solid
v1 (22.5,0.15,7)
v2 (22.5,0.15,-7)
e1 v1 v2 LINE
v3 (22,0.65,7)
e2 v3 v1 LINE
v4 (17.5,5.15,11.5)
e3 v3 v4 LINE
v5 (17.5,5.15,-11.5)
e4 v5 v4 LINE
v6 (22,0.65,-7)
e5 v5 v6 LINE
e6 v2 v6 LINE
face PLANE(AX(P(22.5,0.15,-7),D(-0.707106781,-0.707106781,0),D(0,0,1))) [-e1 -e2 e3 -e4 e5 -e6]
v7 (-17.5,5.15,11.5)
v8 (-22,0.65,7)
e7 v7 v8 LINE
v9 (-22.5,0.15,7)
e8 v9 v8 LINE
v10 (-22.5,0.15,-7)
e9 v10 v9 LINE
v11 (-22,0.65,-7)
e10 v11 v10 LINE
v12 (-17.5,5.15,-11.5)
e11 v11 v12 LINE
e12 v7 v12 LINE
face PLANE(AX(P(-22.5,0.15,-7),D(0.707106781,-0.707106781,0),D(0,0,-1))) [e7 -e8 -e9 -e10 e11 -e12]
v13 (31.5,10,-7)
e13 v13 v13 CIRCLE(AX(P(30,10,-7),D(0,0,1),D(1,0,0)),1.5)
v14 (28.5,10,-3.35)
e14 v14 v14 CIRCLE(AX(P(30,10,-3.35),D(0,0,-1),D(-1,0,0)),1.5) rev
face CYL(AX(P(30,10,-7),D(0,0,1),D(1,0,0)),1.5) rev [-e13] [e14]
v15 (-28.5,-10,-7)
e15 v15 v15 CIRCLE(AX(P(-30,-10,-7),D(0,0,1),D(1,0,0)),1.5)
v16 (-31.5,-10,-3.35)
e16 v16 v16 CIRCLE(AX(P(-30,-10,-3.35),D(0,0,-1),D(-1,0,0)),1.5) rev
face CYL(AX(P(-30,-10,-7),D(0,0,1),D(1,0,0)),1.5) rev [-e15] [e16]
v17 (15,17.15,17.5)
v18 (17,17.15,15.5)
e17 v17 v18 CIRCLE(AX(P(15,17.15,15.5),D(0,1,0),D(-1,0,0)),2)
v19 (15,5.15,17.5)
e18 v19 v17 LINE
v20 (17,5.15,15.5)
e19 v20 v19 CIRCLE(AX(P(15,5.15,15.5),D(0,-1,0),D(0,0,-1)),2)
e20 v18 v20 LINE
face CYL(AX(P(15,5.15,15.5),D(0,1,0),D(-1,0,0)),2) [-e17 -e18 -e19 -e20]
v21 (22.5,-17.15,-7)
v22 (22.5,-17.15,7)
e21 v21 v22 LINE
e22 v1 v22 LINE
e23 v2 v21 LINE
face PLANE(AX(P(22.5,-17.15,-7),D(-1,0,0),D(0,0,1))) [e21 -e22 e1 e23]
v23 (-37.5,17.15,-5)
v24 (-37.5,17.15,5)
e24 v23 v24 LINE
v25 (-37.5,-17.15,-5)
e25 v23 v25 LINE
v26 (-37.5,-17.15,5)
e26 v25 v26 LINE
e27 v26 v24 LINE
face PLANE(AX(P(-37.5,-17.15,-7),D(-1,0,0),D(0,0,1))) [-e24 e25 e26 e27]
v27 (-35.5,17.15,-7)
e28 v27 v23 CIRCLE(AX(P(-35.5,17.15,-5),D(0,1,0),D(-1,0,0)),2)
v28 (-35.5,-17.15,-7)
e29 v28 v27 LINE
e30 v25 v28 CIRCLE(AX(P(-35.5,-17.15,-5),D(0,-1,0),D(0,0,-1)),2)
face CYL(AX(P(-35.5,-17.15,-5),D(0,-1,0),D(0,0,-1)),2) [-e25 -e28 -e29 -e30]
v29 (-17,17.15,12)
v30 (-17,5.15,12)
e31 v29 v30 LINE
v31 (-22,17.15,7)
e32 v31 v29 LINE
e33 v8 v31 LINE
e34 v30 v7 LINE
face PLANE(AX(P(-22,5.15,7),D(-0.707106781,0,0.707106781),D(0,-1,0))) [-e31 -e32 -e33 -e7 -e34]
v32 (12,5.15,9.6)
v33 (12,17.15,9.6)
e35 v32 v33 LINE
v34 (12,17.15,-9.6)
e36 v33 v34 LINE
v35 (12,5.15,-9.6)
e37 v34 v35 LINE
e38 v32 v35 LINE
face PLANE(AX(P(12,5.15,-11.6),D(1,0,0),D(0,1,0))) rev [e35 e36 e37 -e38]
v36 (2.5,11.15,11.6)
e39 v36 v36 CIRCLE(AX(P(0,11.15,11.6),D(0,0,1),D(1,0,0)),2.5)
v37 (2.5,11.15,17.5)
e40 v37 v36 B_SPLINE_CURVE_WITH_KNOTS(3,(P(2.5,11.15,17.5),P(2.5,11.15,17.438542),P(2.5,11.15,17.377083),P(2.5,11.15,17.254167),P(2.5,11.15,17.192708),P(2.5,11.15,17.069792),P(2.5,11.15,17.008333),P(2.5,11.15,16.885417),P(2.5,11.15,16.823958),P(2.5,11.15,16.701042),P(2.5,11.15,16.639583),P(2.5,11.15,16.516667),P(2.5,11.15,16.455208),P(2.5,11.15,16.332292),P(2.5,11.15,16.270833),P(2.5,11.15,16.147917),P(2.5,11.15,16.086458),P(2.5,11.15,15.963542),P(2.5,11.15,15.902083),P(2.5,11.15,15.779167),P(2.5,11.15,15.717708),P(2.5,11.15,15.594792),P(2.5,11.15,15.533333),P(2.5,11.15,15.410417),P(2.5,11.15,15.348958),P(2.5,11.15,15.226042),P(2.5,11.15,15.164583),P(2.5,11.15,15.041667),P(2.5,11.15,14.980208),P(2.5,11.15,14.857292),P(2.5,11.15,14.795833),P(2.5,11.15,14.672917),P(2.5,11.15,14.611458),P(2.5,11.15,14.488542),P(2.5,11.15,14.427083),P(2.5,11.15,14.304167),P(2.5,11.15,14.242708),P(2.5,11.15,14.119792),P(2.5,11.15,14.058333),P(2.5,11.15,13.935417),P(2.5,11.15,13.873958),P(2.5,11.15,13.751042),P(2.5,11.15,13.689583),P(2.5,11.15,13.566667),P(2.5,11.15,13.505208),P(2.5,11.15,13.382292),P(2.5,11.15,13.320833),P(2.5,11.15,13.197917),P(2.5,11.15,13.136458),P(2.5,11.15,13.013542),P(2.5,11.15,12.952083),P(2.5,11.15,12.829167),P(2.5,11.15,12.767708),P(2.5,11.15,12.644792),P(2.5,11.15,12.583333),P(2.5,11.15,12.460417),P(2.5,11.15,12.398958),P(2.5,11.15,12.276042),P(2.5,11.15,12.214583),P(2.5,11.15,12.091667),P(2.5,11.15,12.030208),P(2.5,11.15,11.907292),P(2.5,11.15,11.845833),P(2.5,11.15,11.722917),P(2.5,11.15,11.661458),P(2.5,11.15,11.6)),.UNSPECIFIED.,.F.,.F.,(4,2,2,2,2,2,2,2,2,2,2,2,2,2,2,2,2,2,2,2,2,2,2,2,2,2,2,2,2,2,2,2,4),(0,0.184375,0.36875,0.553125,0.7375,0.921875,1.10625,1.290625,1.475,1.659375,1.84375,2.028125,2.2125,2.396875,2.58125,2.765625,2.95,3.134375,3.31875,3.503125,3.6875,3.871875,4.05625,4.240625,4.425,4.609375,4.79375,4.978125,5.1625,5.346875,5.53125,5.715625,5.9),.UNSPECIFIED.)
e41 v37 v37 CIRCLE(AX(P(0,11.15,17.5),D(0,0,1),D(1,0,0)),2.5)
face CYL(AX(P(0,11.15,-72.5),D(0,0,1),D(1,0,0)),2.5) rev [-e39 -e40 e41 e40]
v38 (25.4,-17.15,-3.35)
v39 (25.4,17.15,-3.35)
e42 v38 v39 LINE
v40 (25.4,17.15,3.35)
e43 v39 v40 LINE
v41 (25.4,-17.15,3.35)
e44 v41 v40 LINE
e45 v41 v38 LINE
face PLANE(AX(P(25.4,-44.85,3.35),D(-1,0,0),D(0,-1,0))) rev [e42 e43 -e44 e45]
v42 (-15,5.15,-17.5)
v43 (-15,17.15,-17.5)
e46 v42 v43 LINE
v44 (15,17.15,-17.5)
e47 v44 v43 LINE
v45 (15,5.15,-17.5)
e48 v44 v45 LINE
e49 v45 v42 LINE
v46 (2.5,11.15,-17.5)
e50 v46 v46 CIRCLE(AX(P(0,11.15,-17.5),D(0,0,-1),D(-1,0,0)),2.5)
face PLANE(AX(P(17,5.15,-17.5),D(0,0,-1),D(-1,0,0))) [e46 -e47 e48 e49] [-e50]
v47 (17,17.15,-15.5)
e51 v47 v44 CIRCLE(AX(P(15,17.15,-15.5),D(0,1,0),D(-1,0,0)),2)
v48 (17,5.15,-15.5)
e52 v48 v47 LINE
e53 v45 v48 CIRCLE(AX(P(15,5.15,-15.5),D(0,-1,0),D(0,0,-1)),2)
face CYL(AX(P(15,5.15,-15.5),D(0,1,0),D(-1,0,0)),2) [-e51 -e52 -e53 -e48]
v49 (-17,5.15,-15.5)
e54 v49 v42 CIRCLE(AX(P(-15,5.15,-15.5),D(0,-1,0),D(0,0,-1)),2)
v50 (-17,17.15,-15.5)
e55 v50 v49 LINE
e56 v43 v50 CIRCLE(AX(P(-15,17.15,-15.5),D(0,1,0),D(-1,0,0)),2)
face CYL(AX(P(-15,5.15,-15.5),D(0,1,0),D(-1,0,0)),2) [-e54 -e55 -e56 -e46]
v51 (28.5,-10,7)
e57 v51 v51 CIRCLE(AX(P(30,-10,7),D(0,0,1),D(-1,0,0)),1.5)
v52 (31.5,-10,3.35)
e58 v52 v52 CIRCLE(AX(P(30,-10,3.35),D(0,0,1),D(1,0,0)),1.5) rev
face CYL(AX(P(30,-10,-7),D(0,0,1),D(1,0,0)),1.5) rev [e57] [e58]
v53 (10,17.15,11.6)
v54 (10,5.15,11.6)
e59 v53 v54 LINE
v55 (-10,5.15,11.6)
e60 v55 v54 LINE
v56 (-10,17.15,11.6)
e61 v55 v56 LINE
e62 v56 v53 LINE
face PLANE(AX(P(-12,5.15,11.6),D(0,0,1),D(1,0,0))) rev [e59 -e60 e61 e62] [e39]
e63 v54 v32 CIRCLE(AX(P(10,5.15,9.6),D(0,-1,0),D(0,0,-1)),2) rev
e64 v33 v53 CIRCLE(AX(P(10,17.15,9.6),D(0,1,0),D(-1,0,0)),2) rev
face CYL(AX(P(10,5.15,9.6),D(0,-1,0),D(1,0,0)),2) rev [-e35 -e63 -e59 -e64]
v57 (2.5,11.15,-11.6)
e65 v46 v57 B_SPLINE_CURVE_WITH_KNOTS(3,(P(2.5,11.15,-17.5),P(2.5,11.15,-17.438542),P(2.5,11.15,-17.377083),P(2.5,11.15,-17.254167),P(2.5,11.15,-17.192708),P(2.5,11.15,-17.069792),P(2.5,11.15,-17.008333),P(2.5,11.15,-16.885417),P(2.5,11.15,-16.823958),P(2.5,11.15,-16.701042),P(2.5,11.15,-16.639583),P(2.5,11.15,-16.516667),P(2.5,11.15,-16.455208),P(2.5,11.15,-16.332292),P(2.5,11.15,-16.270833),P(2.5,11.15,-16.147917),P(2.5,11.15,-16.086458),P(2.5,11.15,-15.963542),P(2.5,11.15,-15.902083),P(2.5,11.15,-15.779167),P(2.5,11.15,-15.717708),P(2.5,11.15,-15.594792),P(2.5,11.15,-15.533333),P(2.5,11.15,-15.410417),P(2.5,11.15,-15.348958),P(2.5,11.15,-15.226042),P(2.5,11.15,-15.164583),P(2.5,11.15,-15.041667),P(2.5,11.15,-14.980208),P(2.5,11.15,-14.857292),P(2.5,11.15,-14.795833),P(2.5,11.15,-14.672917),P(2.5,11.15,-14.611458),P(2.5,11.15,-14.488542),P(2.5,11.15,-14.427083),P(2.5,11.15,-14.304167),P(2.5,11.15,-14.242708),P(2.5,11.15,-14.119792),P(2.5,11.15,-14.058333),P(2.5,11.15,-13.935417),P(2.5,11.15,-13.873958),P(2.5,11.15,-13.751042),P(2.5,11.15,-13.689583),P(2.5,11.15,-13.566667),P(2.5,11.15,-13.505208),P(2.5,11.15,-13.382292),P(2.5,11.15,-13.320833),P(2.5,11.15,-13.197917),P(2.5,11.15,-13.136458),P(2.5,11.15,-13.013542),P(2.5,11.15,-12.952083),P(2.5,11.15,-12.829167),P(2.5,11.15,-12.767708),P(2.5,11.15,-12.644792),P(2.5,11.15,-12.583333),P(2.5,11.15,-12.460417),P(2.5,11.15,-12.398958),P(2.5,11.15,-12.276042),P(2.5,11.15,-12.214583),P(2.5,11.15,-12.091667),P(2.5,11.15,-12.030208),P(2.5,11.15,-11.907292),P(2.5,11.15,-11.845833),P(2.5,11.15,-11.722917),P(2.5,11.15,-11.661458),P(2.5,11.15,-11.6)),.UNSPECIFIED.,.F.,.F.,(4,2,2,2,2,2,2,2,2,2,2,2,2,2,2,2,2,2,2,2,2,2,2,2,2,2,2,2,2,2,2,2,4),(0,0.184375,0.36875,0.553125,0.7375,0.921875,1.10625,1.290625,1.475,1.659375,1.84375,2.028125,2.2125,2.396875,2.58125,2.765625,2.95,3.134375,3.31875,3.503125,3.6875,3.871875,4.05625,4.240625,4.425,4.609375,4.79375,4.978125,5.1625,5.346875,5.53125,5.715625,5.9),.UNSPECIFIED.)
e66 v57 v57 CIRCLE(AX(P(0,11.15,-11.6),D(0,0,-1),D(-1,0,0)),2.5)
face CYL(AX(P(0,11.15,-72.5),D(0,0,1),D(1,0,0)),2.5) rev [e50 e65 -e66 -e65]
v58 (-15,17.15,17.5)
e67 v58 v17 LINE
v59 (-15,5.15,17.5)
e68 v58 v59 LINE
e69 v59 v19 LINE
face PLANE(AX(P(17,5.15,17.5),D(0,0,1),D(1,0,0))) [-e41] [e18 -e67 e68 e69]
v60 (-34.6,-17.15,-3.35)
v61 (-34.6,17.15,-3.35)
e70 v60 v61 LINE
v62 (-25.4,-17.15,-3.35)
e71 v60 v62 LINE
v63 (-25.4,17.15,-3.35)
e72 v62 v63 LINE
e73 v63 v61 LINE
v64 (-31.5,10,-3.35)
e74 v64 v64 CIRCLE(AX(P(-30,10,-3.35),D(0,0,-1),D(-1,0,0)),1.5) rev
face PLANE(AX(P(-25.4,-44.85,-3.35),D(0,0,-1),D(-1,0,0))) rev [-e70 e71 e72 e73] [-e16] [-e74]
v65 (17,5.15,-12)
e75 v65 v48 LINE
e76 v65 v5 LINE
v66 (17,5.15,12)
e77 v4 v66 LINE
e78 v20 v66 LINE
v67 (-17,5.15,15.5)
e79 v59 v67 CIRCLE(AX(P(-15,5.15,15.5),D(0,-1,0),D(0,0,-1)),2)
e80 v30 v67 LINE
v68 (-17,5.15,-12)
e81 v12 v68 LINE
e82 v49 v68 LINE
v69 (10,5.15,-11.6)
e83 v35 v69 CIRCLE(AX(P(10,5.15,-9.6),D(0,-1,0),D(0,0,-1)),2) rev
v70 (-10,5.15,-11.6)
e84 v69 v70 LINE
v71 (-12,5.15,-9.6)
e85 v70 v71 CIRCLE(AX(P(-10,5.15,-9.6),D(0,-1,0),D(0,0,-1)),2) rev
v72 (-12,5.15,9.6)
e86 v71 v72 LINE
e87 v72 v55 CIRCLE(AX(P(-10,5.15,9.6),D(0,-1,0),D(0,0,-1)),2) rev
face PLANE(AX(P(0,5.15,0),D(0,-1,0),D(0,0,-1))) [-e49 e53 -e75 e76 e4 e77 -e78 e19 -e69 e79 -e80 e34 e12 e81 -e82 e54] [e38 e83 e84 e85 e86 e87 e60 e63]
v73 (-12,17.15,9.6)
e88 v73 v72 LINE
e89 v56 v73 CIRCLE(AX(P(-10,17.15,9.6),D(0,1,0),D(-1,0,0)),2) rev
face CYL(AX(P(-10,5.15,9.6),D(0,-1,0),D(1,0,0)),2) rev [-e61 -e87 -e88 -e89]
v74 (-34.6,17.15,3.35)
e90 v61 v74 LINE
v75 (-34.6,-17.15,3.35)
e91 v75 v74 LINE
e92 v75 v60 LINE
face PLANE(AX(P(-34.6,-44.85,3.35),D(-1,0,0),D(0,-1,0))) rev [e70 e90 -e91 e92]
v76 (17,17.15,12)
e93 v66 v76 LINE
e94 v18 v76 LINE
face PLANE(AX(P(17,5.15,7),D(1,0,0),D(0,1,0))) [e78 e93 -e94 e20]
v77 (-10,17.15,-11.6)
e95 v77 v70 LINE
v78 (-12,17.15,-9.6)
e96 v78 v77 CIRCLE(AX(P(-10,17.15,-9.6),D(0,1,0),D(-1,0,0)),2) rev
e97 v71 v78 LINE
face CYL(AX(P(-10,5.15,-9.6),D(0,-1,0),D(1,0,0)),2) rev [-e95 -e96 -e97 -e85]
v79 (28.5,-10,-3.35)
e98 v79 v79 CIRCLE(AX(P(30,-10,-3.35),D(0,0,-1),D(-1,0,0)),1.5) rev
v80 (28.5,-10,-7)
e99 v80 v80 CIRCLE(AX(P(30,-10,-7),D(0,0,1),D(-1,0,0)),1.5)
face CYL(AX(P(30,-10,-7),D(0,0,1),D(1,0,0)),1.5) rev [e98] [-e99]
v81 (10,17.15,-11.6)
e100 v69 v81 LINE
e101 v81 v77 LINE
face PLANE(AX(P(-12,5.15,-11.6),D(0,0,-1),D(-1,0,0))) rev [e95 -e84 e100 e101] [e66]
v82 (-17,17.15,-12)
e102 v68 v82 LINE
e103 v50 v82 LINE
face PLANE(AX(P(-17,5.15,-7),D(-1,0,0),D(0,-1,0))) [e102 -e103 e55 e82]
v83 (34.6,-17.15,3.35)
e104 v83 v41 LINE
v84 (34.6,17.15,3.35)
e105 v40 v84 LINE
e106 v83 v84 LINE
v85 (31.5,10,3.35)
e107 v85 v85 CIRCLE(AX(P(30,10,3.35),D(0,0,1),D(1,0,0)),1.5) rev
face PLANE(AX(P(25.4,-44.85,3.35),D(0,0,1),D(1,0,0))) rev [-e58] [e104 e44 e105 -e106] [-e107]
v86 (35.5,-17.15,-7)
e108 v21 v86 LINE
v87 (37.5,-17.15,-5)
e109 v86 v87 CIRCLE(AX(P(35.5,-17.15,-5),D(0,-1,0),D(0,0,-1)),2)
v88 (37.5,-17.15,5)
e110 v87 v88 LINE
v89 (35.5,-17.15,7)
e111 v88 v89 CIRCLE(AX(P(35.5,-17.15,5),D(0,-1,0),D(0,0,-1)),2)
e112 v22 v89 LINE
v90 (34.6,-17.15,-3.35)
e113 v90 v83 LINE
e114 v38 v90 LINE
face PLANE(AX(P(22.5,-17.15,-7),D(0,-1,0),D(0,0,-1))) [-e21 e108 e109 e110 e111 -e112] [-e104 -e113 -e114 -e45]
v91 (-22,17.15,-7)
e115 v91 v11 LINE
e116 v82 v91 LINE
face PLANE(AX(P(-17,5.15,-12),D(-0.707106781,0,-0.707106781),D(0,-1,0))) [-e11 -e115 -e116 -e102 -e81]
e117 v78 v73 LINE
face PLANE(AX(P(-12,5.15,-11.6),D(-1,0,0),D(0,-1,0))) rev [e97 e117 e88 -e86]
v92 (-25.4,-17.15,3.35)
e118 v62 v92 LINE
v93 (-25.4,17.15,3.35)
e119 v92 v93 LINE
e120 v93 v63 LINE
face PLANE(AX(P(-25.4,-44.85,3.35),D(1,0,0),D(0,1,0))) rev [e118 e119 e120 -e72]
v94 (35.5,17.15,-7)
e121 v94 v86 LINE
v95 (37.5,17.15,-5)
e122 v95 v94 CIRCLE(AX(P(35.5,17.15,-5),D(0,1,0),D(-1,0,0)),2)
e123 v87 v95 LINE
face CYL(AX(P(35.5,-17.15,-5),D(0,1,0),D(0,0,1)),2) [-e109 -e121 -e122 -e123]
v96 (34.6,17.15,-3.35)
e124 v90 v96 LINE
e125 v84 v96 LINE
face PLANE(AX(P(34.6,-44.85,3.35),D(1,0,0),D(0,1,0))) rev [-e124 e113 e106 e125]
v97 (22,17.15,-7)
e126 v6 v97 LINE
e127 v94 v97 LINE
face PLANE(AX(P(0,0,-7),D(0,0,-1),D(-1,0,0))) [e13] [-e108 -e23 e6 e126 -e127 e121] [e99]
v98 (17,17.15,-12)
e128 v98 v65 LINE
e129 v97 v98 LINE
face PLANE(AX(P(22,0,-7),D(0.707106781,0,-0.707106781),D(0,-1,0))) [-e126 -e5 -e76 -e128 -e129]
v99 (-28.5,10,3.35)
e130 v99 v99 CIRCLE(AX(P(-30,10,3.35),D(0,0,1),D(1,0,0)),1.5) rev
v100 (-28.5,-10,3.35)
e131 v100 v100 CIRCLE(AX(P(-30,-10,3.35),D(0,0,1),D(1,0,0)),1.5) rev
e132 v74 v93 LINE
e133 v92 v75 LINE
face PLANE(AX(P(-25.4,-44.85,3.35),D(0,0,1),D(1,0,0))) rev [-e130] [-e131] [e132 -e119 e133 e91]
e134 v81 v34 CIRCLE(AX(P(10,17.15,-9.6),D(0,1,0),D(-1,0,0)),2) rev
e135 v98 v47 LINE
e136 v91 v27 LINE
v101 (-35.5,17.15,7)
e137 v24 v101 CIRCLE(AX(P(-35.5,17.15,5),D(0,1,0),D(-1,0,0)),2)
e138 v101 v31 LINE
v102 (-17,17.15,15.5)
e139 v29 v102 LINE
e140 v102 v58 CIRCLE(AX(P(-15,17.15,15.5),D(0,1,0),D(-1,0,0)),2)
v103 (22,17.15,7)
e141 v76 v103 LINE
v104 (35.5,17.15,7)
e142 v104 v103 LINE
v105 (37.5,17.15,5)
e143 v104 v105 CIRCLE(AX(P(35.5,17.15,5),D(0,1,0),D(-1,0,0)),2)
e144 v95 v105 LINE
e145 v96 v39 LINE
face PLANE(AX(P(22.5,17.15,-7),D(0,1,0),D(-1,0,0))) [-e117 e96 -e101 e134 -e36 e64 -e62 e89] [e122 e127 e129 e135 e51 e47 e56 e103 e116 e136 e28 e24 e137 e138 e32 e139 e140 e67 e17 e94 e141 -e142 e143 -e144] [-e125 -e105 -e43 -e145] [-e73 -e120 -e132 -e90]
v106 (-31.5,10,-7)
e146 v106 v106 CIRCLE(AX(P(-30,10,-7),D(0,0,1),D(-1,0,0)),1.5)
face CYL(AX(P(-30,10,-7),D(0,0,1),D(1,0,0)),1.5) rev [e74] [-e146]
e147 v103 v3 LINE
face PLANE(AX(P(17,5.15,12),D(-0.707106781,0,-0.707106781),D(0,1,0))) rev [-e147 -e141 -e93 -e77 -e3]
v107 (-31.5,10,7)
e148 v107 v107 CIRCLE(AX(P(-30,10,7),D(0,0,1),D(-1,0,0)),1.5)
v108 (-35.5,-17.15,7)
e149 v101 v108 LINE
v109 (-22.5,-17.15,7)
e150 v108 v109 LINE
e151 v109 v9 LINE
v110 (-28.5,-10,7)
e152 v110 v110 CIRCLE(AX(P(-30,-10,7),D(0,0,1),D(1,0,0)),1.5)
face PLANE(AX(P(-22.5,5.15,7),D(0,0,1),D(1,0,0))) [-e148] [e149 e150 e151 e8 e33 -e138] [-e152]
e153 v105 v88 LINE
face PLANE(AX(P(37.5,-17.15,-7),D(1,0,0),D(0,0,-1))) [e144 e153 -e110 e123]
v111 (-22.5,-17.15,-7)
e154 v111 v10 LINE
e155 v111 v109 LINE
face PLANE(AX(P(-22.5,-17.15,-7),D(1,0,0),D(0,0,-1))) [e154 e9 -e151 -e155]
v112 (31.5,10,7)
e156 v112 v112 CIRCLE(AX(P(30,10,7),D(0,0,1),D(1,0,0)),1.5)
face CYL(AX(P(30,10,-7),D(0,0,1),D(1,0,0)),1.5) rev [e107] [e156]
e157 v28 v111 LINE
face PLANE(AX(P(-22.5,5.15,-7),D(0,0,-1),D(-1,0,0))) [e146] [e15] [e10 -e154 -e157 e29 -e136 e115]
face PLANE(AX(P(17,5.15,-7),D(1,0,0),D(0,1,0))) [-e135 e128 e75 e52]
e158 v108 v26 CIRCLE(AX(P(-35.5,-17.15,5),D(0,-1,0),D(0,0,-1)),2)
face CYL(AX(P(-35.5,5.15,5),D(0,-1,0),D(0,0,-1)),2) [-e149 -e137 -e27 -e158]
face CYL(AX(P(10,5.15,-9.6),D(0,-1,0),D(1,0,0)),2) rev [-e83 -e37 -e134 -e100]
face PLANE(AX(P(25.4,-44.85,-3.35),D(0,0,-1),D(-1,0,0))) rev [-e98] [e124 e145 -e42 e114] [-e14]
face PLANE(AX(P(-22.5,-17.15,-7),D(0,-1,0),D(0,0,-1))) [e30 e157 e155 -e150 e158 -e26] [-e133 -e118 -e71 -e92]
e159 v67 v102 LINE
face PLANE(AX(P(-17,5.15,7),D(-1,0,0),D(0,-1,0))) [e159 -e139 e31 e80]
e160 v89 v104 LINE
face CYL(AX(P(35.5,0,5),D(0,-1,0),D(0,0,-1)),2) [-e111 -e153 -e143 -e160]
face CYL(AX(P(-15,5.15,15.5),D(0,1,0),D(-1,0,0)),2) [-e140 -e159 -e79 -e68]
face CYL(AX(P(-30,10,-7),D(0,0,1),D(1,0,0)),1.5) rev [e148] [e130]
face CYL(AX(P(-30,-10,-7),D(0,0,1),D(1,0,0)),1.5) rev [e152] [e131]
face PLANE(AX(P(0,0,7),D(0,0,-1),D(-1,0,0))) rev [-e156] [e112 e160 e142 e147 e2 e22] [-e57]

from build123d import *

# Parameters (mm, degrees)
EXTRUDE_1_DEPTH        = 7
EXTRUDE_1_DEPTH_BACK   = 7
SKETCH_1_W             = 15
SKETCH_1_H             = 34.3
SKETCH_1_R             = 1.5
EXTRUDE_1_2_DEPTH      = 7
EXTRUDE_1_2_DEPTH_BACK = 7
SKETCH_2_W             = 9.2
SKETCH_2_H             = 6.7
CUT_EXTRUDE_1_DEPTH    = 62
SKETCH_3_W             = 24
SKETCH_3_H             = 23.2
EXTRUDE_2_DEPTH        = 12
SKETCH_4_R             = 2.5
CUT_EXTRUDE_2_DEPTH    = 90
FILLET_1_R             = 2
CHAMFER_1_SIZE         = 5
CHAMFER_2_SIZE         = 5
FILLET_2_R             = 2


with BuildPart() as part:
    # 草图1 → 凸台-拉伸1 (new, two sides: drawn at the far end of the back side and taken through both)
    with BuildSketch(Plane.XY.offset(-EXTRUDE_1_DEPTH_BACK)):
        with Locations((30, 0)):
            Rectangle(SKETCH_1_W, SKETCH_1_H)
        with Locations((30, 10)):
            Circle(SKETCH_1_R, mode=Mode.SUBTRACT)
        with Locations(Location((30, -10, 0), (0, 0, 180))):
            Circle(SKETCH_1_R, mode=Mode.SUBTRACT)
    extrude(amount=EXTRUDE_1_DEPTH + EXTRUDE_1_DEPTH_BACK)


with BuildPart() as body_2:
    # 草图1 → Extrude 1 2 (new, two sides: drawn at the far end of the back side and taken through both)
    with BuildSketch(Plane.XY.offset(-EXTRUDE_1_2_DEPTH_BACK)):
        with Locations((-30, 0)):
            Rectangle(SKETCH_1_W, SKETCH_1_H)
        with Locations((-30, -10)):
            Circle(SKETCH_1_R, mode=Mode.SUBTRACT)
        with Locations(Location((-30, 10, 0), (0, 0, 180))):
            Circle(SKETCH_1_R, mode=Mode.SUBTRACT)
    extrude(amount=EXTRUDE_1_2_DEPTH + EXTRUDE_1_2_DEPTH_BACK)


with BuildPart() as cut_extrude_1_tool:
    # 草图2 → 切除-拉伸1 (new body)
    with BuildSketch(Plane(origin=(0, 17.15, 0), x_dir=(1, 0, 0), z_dir=(0, 1, 0))):
        with Locations((30, 0)):
            Rectangle(SKETCH_2_W, SKETCH_2_H)
        with Locations((-30, 0)):
            Rectangle(SKETCH_2_W, SKETCH_2_H)
    extrude(amount=-CUT_EXTRUDE_1_DEPTH)


with BuildPart() as part_1:
    add(part.part)

    # 切除-拉伸1: cut by cut_extrude_1_tool
    add(cut_extrude_1_tool.part, mode=Mode.SUBTRACT)



with BuildPart() as body_2_1:
    add(body_2.part)

    # 切除-拉伸1: cut by cut_extrude_1_tool
    add(cut_extrude_1_tool.part, mode=Mode.SUBTRACT)


with BuildPart() as part_2:
    add(part_1.part)

    add(body_2_1.part)  # 凸台-拉伸2 merges body 2
    # 草图3 → 凸台-拉伸2 (add)
    with BuildSketch(Plane(origin=(0, 17.15, 0), x_dir=(1, 0, 0), z_dir=(0, 1, 0))):
        Polygon((22.5, 7), (17, 7), (17, 17.5), (-17, 17.5), (-17, 7), (-22.5, 7), (-22.5, -7), (-17, -7), (-17, -17.5), (17, -17.5), (17, -7), (22.5, -7), align=None)
        Rectangle(SKETCH_3_W, SKETCH_3_H, mode=Mode.SUBTRACT)
    extrude(amount=-EXTRUDE_2_DEPTH)

    # 草图4 → 切除-拉伸2 (cut)
    with BuildSketch(Plane.XY.offset(17.5)):
        with Locations((0, 11.15)):
            Circle(SKETCH_4_R)
    extrude(amount=-CUT_EXTRUDE_2_DEPTH, mode=Mode.SUBTRACT)

    # 圆角1
    fillet_1_edges = [part_2.edges().sort_by_distance(p)[0] for p in [
        (-37.5, 0, -7),
        (-37.5, 0, 7),
        (37.5, 0, 7),
        (37.5, 0, -7),
    ]]
    fillet(fillet_1_edges, radius=FILLET_1_R)

    # 倒角1
    chamfer_1_edges = [part_2.edges().sort_by_distance(p)[0] for p in [
        (22.5, 5.15, 0),
        (-22.5, 5.15, 0),
    ]]
    chamfer(chamfer_1_edges, length=CHAMFER_1_SIZE)

    # 倒角2
    # the kernel refuses this chamfer: 5 mm, written as the material it adds along each edge
    with BuildSketch(Plane(origin=(17, 17.15, -7), x_dir=(0.9996219169112968, 0, 0.027495876610586147), z_dir=(0, -1, 0))) as chamfer_2_piece_1_section:
        Polygon((CHAMFER_2_SIZE * 0.999621916911, -CHAMFER_2_SIZE * 0.0274958766106), (-CHAMFER_2_SIZE * 0.0274958766106, -CHAMFER_2_SIZE * 0.999621916911), (0, 0), align=None)
    chamfer_2_piece_1 = extrude(amount=12, mode=Mode.PRIVATE)
    chamfer_2_piece_1 = split(chamfer_2_piece_1, bisect_by=Plane(origin=(15.061953737, 7.588046263, -8.643148294), z_dir=(0.7071067811865476, 0.7071067811865475, 0)), keep=Keep.TOP, mode=Mode.PRIVATE)
    add(chamfer_2_piece_1)
    with BuildSketch(Plane(origin=(17, 17.15, -7), x_dir=(0.9996219169112968, 0, 0.027495876610586147), z_dir=(0, -1, 0))) as chamfer_2_piece_2_section:
        Polygon((CHAMFER_2_SIZE * 0.999621916911, -CHAMFER_2_SIZE * 0.0274958766106), (-CHAMFER_2_SIZE * 0.0274958766106, -CHAMFER_2_SIZE * 0.999621916911), (0, 0), align=None)
    chamfer_2_piece_2 = extrude(amount=12, mode=Mode.PRIVATE)
    chamfer_2_piece_2 = split(chamfer_2_piece_2, bisect_by=Plane(origin=(17.181894142, 5.468105858, -9.627776216), z_dir=(-0.7071067811865476, -0.7071067811865475, 0)), keep=Keep.TOP, mode=Mode.PRIVATE)
    add(chamfer_2_piece_2)
    with BuildSketch(Plane(origin=(17, 17.15, -7), x_dir=(0.9996219169112968, 0, 0.027495876610586147), z_dir=(0, -1, 0))) as chamfer_2_piece_3_section:
        Polygon((CHAMFER_2_SIZE * 0.999621916911, -CHAMFER_2_SIZE * 0.0274958766106), (-CHAMFER_2_SIZE * 0.0274958766106, -CHAMFER_2_SIZE * 0.999621916911), (0, 0), align=None)
    chamfer_2_piece_3 = extrude(amount=24.85841494, mode=Mode.PRIVATE)
    chamfer_2_piece_3 = split(chamfer_2_piece_3, bisect_by=Plane(origin=(19.269171179, 3.380828821, -8.010149173), z_dir=(0.7071067811865476, 0.7071067811865475, 0)), keep=Keep.TOP, mode=Mode.PRIVATE)
    chamfer_2_piece_3 = split(chamfer_2_piece_3, bisect_by=Plane(origin=(19.858894906, 5.15, -8.010149173), z_dir=(0, -1, 0)), keep=Keep.TOP, mode=Mode.PRIVATE)
    add(chamfer_2_piece_3)
    with BuildSketch(Plane(origin=(-17, 17.15, -7), x_dir=(0.027495876610586313, 0, -0.9996219169112968), z_dir=(0, -1, 0))) as chamfer_2_piece_4_section:
        Polygon((CHAMFER_2_SIZE * 0.999621916911, -CHAMFER_2_SIZE * 0.0274958766106), (-CHAMFER_2_SIZE * 0.0274958766106, -CHAMFER_2_SIZE * 0.999621916911), (0, 0), align=None)
    chamfer_2_piece_4 = extrude(amount=12, mode=Mode.PRIVATE)
    chamfer_2_piece_4 = split(chamfer_2_piece_4, bisect_by=Plane(origin=(-15.061953737, 7.588046263, -8.643148294), z_dir=(-0.7071067811865475, 0.7071067811865476, 0)), keep=Keep.TOP, mode=Mode.PRIVATE)
    add(chamfer_2_piece_4)
    with BuildSketch(Plane(origin=(-17, 17.15, -7), x_dir=(0.027495876610586313, 0, -0.9996219169112968), z_dir=(0, -1, 0))) as chamfer_2_piece_5_section:
        Polygon((CHAMFER_2_SIZE * 0.999621916911, -CHAMFER_2_SIZE * 0.0274958766106), (-CHAMFER_2_SIZE * 0.0274958766106, -CHAMFER_2_SIZE * 0.999621916911), (0, 0), align=None)
    chamfer_2_piece_5 = extrude(amount=24.85841494, mode=Mode.PRIVATE)
    chamfer_2_piece_5 = split(chamfer_2_piece_5, bisect_by=Plane(origin=(-19.858894906, 5.15, -8.010149173), z_dir=(0, -1, 0)), keep=Keep.TOP, mode=Mode.PRIVATE)
    chamfer_2_piece_5 = split(chamfer_2_piece_5, bisect_by=Plane(origin=(-19.269171179, 3.380828821, -8.010149173), z_dir=(-0.7071067811865475, 0.7071067811865476, 0)), keep=Keep.TOP, mode=Mode.PRIVATE)
    add(chamfer_2_piece_5)
    with BuildSketch(Plane(origin=(-17, 17.15, -7), x_dir=(0.027495876610586313, 0, -0.9996219169112968), z_dir=(0, -1, 0))) as chamfer_2_piece_6_section:
        Polygon((CHAMFER_2_SIZE * 0.999621916911, -CHAMFER_2_SIZE * 0.0274958766106), (-CHAMFER_2_SIZE * 0.0274958766106, -CHAMFER_2_SIZE * 0.999621916911), (0, 0), align=None)
    chamfer_2_piece_6 = extrude(amount=12, mode=Mode.PRIVATE)
    chamfer_2_piece_6 = split(chamfer_2_piece_6, bisect_by=Plane(origin=(-17.181894142, 5.468105858, -9.627776216), z_dir=(0.7071067811865475, -0.7071067811865476, 0)), keep=Keep.TOP, mode=Mode.PRIVATE)
    add(chamfer_2_piece_6)
    with BuildSketch(Plane(origin=(17, 17.15, 7), x_dir=(0.9996219169112968, 0, -0.027495876610586147), z_dir=(0, -1, 0))) as chamfer_2_piece_7_section:
        Polygon((CHAMFER_2_SIZE * 0.999621916911, CHAMFER_2_SIZE * 0.0274958766106), (-CHAMFER_2_SIZE * 0.0274958766106, CHAMFER_2_SIZE * 0.999621916911), (0, 0), align=None)
    chamfer_2_piece_7 = extrude(amount=12, mode=Mode.PRIVATE)
    chamfer_2_piece_7 = split(chamfer_2_piece_7, bisect_by=Plane(origin=(15.061953737, 7.588046263, 8.643148294), z_dir=(0.7071067811865476, 0.7071067811865475, 0)), keep=Keep.TOP, mode=Mode.PRIVATE)
    add(chamfer_2_piece_7)
    with BuildSketch(Plane(origin=(17, 17.15, 7), x_dir=(0.9996219169112968, 0, -0.027495876610586147), z_dir=(0, -1, 0))) as chamfer_2_piece_8_section:
        Polygon((CHAMFER_2_SIZE * 0.999621916911, CHAMFER_2_SIZE * 0.0274958766106), (-CHAMFER_2_SIZE * 0.0274958766106, CHAMFER_2_SIZE * 0.999621916911), (0, 0), align=None)
    chamfer_2_piece_8 = extrude(amount=12, mode=Mode.PRIVATE)
    chamfer_2_piece_8 = split(chamfer_2_piece_8, bisect_by=Plane(origin=(17.181894142, 5.468105858, 9.627776216), z_dir=(-0.7071067811865476, -0.7071067811865475, 0)), keep=Keep.TOP, mode=Mode.PRIVATE)
    add(chamfer_2_piece_8)
    with BuildSketch(Plane(origin=(17, 17.15, 7), x_dir=(0.9996219169112968, 0, -0.027495876610586147), z_dir=(0, -1, 0))) as chamfer_2_piece_9_section:
        Polygon((CHAMFER_2_SIZE * 0.999621916911, CHAMFER_2_SIZE * 0.0274958766106), (-CHAMFER_2_SIZE * 0.0274958766106, CHAMFER_2_SIZE * 0.999621916911), (0, 0), align=None)
    chamfer_2_piece_9 = extrude(amount=24.85841494, mode=Mode.PRIVATE)
    chamfer_2_piece_9 = split(chamfer_2_piece_9, bisect_by=Plane(origin=(19.269171179, 3.380828821, 8.010149173), z_dir=(0.7071067811865476, 0.7071067811865475, 0)), keep=Keep.TOP, mode=Mode.PRIVATE)
    chamfer_2_piece_9 = split(chamfer_2_piece_9, bisect_by=Plane(origin=(19.858894906, 5.15, 8.010149173), z_dir=(0, -1, 0)), keep=Keep.TOP, mode=Mode.PRIVATE)
    add(chamfer_2_piece_9)
    with BuildSketch(Plane(origin=(-17, 17.15, 7), x_dir=(0.027495876610586313, 0, 0.9996219169112968), z_dir=(0, -1, 0))) as chamfer_2_piece_10_section:
        Polygon((CHAMFER_2_SIZE * 0.999621916911, CHAMFER_2_SIZE * 0.0274958766106), (-CHAMFER_2_SIZE * 0.0274958766106, CHAMFER_2_SIZE * 0.999621916911), (0, 0), align=None)
    chamfer_2_piece_10 = extrude(amount=12, mode=Mode.PRIVATE)
    chamfer_2_piece_10 = split(chamfer_2_piece_10, bisect_by=Plane(origin=(-15.061953737, 7.588046263, 8.643148294), z_dir=(-0.7071067811865475, 0.7071067811865476, 0)), keep=Keep.TOP, mode=Mode.PRIVATE)
    add(chamfer_2_piece_10)
    with BuildSketch(Plane(origin=(-17, 17.15, 7), x_dir=(0.027495876610586313, 0, 0.9996219169112968), z_dir=(0, -1, 0))) as chamfer_2_piece_11_section:
        Polygon((CHAMFER_2_SIZE * 0.999621916911, CHAMFER_2_SIZE * 0.0274958766106), (-CHAMFER_2_SIZE * 0.0274958766106, CHAMFER_2_SIZE * 0.999621916911), (0, 0), align=None)
    chamfer_2_piece_11 = extrude(amount=24.85841494, mode=Mode.PRIVATE)
    chamfer_2_piece_11 = split(chamfer_2_piece_11, bisect_by=Plane(origin=(-19.858894906, 5.15, 8.010149173), z_dir=(0, -1, 0)), keep=Keep.TOP, mode=Mode.PRIVATE)
    chamfer_2_piece_11 = split(chamfer_2_piece_11, bisect_by=Plane(origin=(-19.269171179, 3.380828821, 8.010149173), z_dir=(-0.7071067811865475, 0.7071067811865476, 0)), keep=Keep.TOP, mode=Mode.PRIVATE)
    add(chamfer_2_piece_11)
    with BuildSketch(Plane(origin=(-17, 17.15, 7), x_dir=(0.027495876610586313, 0, 0.9996219169112968), z_dir=(0, -1, 0))) as chamfer_2_piece_12_section:
        Polygon((CHAMFER_2_SIZE * 0.999621916911, CHAMFER_2_SIZE * 0.0274958766106), (-CHAMFER_2_SIZE * 0.0274958766106, CHAMFER_2_SIZE * 0.999621916911), (0, 0), align=None)
    chamfer_2_piece_12 = extrude(amount=12, mode=Mode.PRIVATE)
    chamfer_2_piece_12 = split(chamfer_2_piece_12, bisect_by=Plane(origin=(-17.181894142, 5.468105858, 9.627776216), z_dir=(0.7071067811865475, -0.7071067811865476, 0)), keep=Keep.TOP, mode=Mode.PRIVATE)
    add(chamfer_2_piece_12)

    # 圆角2
    fillet_2_edges = [part_2.edges().sort_by_distance(p)[0] for p in [
        (12, 11.15, -11.6),
        (17, 11.15, 17.5),
        (-17, 11.15, 17.5),
        (-17, 11.15, -17.5),
        (17, 11.15, -17.5),
        (12, 11.15, 11.6),
        (-12, 11.15, 11.6),
        (-12, 11.15, -11.6),
    ]]
    fillet(fillet_2_edges, radius=FILLET_2_R)


solid = part_2.part
